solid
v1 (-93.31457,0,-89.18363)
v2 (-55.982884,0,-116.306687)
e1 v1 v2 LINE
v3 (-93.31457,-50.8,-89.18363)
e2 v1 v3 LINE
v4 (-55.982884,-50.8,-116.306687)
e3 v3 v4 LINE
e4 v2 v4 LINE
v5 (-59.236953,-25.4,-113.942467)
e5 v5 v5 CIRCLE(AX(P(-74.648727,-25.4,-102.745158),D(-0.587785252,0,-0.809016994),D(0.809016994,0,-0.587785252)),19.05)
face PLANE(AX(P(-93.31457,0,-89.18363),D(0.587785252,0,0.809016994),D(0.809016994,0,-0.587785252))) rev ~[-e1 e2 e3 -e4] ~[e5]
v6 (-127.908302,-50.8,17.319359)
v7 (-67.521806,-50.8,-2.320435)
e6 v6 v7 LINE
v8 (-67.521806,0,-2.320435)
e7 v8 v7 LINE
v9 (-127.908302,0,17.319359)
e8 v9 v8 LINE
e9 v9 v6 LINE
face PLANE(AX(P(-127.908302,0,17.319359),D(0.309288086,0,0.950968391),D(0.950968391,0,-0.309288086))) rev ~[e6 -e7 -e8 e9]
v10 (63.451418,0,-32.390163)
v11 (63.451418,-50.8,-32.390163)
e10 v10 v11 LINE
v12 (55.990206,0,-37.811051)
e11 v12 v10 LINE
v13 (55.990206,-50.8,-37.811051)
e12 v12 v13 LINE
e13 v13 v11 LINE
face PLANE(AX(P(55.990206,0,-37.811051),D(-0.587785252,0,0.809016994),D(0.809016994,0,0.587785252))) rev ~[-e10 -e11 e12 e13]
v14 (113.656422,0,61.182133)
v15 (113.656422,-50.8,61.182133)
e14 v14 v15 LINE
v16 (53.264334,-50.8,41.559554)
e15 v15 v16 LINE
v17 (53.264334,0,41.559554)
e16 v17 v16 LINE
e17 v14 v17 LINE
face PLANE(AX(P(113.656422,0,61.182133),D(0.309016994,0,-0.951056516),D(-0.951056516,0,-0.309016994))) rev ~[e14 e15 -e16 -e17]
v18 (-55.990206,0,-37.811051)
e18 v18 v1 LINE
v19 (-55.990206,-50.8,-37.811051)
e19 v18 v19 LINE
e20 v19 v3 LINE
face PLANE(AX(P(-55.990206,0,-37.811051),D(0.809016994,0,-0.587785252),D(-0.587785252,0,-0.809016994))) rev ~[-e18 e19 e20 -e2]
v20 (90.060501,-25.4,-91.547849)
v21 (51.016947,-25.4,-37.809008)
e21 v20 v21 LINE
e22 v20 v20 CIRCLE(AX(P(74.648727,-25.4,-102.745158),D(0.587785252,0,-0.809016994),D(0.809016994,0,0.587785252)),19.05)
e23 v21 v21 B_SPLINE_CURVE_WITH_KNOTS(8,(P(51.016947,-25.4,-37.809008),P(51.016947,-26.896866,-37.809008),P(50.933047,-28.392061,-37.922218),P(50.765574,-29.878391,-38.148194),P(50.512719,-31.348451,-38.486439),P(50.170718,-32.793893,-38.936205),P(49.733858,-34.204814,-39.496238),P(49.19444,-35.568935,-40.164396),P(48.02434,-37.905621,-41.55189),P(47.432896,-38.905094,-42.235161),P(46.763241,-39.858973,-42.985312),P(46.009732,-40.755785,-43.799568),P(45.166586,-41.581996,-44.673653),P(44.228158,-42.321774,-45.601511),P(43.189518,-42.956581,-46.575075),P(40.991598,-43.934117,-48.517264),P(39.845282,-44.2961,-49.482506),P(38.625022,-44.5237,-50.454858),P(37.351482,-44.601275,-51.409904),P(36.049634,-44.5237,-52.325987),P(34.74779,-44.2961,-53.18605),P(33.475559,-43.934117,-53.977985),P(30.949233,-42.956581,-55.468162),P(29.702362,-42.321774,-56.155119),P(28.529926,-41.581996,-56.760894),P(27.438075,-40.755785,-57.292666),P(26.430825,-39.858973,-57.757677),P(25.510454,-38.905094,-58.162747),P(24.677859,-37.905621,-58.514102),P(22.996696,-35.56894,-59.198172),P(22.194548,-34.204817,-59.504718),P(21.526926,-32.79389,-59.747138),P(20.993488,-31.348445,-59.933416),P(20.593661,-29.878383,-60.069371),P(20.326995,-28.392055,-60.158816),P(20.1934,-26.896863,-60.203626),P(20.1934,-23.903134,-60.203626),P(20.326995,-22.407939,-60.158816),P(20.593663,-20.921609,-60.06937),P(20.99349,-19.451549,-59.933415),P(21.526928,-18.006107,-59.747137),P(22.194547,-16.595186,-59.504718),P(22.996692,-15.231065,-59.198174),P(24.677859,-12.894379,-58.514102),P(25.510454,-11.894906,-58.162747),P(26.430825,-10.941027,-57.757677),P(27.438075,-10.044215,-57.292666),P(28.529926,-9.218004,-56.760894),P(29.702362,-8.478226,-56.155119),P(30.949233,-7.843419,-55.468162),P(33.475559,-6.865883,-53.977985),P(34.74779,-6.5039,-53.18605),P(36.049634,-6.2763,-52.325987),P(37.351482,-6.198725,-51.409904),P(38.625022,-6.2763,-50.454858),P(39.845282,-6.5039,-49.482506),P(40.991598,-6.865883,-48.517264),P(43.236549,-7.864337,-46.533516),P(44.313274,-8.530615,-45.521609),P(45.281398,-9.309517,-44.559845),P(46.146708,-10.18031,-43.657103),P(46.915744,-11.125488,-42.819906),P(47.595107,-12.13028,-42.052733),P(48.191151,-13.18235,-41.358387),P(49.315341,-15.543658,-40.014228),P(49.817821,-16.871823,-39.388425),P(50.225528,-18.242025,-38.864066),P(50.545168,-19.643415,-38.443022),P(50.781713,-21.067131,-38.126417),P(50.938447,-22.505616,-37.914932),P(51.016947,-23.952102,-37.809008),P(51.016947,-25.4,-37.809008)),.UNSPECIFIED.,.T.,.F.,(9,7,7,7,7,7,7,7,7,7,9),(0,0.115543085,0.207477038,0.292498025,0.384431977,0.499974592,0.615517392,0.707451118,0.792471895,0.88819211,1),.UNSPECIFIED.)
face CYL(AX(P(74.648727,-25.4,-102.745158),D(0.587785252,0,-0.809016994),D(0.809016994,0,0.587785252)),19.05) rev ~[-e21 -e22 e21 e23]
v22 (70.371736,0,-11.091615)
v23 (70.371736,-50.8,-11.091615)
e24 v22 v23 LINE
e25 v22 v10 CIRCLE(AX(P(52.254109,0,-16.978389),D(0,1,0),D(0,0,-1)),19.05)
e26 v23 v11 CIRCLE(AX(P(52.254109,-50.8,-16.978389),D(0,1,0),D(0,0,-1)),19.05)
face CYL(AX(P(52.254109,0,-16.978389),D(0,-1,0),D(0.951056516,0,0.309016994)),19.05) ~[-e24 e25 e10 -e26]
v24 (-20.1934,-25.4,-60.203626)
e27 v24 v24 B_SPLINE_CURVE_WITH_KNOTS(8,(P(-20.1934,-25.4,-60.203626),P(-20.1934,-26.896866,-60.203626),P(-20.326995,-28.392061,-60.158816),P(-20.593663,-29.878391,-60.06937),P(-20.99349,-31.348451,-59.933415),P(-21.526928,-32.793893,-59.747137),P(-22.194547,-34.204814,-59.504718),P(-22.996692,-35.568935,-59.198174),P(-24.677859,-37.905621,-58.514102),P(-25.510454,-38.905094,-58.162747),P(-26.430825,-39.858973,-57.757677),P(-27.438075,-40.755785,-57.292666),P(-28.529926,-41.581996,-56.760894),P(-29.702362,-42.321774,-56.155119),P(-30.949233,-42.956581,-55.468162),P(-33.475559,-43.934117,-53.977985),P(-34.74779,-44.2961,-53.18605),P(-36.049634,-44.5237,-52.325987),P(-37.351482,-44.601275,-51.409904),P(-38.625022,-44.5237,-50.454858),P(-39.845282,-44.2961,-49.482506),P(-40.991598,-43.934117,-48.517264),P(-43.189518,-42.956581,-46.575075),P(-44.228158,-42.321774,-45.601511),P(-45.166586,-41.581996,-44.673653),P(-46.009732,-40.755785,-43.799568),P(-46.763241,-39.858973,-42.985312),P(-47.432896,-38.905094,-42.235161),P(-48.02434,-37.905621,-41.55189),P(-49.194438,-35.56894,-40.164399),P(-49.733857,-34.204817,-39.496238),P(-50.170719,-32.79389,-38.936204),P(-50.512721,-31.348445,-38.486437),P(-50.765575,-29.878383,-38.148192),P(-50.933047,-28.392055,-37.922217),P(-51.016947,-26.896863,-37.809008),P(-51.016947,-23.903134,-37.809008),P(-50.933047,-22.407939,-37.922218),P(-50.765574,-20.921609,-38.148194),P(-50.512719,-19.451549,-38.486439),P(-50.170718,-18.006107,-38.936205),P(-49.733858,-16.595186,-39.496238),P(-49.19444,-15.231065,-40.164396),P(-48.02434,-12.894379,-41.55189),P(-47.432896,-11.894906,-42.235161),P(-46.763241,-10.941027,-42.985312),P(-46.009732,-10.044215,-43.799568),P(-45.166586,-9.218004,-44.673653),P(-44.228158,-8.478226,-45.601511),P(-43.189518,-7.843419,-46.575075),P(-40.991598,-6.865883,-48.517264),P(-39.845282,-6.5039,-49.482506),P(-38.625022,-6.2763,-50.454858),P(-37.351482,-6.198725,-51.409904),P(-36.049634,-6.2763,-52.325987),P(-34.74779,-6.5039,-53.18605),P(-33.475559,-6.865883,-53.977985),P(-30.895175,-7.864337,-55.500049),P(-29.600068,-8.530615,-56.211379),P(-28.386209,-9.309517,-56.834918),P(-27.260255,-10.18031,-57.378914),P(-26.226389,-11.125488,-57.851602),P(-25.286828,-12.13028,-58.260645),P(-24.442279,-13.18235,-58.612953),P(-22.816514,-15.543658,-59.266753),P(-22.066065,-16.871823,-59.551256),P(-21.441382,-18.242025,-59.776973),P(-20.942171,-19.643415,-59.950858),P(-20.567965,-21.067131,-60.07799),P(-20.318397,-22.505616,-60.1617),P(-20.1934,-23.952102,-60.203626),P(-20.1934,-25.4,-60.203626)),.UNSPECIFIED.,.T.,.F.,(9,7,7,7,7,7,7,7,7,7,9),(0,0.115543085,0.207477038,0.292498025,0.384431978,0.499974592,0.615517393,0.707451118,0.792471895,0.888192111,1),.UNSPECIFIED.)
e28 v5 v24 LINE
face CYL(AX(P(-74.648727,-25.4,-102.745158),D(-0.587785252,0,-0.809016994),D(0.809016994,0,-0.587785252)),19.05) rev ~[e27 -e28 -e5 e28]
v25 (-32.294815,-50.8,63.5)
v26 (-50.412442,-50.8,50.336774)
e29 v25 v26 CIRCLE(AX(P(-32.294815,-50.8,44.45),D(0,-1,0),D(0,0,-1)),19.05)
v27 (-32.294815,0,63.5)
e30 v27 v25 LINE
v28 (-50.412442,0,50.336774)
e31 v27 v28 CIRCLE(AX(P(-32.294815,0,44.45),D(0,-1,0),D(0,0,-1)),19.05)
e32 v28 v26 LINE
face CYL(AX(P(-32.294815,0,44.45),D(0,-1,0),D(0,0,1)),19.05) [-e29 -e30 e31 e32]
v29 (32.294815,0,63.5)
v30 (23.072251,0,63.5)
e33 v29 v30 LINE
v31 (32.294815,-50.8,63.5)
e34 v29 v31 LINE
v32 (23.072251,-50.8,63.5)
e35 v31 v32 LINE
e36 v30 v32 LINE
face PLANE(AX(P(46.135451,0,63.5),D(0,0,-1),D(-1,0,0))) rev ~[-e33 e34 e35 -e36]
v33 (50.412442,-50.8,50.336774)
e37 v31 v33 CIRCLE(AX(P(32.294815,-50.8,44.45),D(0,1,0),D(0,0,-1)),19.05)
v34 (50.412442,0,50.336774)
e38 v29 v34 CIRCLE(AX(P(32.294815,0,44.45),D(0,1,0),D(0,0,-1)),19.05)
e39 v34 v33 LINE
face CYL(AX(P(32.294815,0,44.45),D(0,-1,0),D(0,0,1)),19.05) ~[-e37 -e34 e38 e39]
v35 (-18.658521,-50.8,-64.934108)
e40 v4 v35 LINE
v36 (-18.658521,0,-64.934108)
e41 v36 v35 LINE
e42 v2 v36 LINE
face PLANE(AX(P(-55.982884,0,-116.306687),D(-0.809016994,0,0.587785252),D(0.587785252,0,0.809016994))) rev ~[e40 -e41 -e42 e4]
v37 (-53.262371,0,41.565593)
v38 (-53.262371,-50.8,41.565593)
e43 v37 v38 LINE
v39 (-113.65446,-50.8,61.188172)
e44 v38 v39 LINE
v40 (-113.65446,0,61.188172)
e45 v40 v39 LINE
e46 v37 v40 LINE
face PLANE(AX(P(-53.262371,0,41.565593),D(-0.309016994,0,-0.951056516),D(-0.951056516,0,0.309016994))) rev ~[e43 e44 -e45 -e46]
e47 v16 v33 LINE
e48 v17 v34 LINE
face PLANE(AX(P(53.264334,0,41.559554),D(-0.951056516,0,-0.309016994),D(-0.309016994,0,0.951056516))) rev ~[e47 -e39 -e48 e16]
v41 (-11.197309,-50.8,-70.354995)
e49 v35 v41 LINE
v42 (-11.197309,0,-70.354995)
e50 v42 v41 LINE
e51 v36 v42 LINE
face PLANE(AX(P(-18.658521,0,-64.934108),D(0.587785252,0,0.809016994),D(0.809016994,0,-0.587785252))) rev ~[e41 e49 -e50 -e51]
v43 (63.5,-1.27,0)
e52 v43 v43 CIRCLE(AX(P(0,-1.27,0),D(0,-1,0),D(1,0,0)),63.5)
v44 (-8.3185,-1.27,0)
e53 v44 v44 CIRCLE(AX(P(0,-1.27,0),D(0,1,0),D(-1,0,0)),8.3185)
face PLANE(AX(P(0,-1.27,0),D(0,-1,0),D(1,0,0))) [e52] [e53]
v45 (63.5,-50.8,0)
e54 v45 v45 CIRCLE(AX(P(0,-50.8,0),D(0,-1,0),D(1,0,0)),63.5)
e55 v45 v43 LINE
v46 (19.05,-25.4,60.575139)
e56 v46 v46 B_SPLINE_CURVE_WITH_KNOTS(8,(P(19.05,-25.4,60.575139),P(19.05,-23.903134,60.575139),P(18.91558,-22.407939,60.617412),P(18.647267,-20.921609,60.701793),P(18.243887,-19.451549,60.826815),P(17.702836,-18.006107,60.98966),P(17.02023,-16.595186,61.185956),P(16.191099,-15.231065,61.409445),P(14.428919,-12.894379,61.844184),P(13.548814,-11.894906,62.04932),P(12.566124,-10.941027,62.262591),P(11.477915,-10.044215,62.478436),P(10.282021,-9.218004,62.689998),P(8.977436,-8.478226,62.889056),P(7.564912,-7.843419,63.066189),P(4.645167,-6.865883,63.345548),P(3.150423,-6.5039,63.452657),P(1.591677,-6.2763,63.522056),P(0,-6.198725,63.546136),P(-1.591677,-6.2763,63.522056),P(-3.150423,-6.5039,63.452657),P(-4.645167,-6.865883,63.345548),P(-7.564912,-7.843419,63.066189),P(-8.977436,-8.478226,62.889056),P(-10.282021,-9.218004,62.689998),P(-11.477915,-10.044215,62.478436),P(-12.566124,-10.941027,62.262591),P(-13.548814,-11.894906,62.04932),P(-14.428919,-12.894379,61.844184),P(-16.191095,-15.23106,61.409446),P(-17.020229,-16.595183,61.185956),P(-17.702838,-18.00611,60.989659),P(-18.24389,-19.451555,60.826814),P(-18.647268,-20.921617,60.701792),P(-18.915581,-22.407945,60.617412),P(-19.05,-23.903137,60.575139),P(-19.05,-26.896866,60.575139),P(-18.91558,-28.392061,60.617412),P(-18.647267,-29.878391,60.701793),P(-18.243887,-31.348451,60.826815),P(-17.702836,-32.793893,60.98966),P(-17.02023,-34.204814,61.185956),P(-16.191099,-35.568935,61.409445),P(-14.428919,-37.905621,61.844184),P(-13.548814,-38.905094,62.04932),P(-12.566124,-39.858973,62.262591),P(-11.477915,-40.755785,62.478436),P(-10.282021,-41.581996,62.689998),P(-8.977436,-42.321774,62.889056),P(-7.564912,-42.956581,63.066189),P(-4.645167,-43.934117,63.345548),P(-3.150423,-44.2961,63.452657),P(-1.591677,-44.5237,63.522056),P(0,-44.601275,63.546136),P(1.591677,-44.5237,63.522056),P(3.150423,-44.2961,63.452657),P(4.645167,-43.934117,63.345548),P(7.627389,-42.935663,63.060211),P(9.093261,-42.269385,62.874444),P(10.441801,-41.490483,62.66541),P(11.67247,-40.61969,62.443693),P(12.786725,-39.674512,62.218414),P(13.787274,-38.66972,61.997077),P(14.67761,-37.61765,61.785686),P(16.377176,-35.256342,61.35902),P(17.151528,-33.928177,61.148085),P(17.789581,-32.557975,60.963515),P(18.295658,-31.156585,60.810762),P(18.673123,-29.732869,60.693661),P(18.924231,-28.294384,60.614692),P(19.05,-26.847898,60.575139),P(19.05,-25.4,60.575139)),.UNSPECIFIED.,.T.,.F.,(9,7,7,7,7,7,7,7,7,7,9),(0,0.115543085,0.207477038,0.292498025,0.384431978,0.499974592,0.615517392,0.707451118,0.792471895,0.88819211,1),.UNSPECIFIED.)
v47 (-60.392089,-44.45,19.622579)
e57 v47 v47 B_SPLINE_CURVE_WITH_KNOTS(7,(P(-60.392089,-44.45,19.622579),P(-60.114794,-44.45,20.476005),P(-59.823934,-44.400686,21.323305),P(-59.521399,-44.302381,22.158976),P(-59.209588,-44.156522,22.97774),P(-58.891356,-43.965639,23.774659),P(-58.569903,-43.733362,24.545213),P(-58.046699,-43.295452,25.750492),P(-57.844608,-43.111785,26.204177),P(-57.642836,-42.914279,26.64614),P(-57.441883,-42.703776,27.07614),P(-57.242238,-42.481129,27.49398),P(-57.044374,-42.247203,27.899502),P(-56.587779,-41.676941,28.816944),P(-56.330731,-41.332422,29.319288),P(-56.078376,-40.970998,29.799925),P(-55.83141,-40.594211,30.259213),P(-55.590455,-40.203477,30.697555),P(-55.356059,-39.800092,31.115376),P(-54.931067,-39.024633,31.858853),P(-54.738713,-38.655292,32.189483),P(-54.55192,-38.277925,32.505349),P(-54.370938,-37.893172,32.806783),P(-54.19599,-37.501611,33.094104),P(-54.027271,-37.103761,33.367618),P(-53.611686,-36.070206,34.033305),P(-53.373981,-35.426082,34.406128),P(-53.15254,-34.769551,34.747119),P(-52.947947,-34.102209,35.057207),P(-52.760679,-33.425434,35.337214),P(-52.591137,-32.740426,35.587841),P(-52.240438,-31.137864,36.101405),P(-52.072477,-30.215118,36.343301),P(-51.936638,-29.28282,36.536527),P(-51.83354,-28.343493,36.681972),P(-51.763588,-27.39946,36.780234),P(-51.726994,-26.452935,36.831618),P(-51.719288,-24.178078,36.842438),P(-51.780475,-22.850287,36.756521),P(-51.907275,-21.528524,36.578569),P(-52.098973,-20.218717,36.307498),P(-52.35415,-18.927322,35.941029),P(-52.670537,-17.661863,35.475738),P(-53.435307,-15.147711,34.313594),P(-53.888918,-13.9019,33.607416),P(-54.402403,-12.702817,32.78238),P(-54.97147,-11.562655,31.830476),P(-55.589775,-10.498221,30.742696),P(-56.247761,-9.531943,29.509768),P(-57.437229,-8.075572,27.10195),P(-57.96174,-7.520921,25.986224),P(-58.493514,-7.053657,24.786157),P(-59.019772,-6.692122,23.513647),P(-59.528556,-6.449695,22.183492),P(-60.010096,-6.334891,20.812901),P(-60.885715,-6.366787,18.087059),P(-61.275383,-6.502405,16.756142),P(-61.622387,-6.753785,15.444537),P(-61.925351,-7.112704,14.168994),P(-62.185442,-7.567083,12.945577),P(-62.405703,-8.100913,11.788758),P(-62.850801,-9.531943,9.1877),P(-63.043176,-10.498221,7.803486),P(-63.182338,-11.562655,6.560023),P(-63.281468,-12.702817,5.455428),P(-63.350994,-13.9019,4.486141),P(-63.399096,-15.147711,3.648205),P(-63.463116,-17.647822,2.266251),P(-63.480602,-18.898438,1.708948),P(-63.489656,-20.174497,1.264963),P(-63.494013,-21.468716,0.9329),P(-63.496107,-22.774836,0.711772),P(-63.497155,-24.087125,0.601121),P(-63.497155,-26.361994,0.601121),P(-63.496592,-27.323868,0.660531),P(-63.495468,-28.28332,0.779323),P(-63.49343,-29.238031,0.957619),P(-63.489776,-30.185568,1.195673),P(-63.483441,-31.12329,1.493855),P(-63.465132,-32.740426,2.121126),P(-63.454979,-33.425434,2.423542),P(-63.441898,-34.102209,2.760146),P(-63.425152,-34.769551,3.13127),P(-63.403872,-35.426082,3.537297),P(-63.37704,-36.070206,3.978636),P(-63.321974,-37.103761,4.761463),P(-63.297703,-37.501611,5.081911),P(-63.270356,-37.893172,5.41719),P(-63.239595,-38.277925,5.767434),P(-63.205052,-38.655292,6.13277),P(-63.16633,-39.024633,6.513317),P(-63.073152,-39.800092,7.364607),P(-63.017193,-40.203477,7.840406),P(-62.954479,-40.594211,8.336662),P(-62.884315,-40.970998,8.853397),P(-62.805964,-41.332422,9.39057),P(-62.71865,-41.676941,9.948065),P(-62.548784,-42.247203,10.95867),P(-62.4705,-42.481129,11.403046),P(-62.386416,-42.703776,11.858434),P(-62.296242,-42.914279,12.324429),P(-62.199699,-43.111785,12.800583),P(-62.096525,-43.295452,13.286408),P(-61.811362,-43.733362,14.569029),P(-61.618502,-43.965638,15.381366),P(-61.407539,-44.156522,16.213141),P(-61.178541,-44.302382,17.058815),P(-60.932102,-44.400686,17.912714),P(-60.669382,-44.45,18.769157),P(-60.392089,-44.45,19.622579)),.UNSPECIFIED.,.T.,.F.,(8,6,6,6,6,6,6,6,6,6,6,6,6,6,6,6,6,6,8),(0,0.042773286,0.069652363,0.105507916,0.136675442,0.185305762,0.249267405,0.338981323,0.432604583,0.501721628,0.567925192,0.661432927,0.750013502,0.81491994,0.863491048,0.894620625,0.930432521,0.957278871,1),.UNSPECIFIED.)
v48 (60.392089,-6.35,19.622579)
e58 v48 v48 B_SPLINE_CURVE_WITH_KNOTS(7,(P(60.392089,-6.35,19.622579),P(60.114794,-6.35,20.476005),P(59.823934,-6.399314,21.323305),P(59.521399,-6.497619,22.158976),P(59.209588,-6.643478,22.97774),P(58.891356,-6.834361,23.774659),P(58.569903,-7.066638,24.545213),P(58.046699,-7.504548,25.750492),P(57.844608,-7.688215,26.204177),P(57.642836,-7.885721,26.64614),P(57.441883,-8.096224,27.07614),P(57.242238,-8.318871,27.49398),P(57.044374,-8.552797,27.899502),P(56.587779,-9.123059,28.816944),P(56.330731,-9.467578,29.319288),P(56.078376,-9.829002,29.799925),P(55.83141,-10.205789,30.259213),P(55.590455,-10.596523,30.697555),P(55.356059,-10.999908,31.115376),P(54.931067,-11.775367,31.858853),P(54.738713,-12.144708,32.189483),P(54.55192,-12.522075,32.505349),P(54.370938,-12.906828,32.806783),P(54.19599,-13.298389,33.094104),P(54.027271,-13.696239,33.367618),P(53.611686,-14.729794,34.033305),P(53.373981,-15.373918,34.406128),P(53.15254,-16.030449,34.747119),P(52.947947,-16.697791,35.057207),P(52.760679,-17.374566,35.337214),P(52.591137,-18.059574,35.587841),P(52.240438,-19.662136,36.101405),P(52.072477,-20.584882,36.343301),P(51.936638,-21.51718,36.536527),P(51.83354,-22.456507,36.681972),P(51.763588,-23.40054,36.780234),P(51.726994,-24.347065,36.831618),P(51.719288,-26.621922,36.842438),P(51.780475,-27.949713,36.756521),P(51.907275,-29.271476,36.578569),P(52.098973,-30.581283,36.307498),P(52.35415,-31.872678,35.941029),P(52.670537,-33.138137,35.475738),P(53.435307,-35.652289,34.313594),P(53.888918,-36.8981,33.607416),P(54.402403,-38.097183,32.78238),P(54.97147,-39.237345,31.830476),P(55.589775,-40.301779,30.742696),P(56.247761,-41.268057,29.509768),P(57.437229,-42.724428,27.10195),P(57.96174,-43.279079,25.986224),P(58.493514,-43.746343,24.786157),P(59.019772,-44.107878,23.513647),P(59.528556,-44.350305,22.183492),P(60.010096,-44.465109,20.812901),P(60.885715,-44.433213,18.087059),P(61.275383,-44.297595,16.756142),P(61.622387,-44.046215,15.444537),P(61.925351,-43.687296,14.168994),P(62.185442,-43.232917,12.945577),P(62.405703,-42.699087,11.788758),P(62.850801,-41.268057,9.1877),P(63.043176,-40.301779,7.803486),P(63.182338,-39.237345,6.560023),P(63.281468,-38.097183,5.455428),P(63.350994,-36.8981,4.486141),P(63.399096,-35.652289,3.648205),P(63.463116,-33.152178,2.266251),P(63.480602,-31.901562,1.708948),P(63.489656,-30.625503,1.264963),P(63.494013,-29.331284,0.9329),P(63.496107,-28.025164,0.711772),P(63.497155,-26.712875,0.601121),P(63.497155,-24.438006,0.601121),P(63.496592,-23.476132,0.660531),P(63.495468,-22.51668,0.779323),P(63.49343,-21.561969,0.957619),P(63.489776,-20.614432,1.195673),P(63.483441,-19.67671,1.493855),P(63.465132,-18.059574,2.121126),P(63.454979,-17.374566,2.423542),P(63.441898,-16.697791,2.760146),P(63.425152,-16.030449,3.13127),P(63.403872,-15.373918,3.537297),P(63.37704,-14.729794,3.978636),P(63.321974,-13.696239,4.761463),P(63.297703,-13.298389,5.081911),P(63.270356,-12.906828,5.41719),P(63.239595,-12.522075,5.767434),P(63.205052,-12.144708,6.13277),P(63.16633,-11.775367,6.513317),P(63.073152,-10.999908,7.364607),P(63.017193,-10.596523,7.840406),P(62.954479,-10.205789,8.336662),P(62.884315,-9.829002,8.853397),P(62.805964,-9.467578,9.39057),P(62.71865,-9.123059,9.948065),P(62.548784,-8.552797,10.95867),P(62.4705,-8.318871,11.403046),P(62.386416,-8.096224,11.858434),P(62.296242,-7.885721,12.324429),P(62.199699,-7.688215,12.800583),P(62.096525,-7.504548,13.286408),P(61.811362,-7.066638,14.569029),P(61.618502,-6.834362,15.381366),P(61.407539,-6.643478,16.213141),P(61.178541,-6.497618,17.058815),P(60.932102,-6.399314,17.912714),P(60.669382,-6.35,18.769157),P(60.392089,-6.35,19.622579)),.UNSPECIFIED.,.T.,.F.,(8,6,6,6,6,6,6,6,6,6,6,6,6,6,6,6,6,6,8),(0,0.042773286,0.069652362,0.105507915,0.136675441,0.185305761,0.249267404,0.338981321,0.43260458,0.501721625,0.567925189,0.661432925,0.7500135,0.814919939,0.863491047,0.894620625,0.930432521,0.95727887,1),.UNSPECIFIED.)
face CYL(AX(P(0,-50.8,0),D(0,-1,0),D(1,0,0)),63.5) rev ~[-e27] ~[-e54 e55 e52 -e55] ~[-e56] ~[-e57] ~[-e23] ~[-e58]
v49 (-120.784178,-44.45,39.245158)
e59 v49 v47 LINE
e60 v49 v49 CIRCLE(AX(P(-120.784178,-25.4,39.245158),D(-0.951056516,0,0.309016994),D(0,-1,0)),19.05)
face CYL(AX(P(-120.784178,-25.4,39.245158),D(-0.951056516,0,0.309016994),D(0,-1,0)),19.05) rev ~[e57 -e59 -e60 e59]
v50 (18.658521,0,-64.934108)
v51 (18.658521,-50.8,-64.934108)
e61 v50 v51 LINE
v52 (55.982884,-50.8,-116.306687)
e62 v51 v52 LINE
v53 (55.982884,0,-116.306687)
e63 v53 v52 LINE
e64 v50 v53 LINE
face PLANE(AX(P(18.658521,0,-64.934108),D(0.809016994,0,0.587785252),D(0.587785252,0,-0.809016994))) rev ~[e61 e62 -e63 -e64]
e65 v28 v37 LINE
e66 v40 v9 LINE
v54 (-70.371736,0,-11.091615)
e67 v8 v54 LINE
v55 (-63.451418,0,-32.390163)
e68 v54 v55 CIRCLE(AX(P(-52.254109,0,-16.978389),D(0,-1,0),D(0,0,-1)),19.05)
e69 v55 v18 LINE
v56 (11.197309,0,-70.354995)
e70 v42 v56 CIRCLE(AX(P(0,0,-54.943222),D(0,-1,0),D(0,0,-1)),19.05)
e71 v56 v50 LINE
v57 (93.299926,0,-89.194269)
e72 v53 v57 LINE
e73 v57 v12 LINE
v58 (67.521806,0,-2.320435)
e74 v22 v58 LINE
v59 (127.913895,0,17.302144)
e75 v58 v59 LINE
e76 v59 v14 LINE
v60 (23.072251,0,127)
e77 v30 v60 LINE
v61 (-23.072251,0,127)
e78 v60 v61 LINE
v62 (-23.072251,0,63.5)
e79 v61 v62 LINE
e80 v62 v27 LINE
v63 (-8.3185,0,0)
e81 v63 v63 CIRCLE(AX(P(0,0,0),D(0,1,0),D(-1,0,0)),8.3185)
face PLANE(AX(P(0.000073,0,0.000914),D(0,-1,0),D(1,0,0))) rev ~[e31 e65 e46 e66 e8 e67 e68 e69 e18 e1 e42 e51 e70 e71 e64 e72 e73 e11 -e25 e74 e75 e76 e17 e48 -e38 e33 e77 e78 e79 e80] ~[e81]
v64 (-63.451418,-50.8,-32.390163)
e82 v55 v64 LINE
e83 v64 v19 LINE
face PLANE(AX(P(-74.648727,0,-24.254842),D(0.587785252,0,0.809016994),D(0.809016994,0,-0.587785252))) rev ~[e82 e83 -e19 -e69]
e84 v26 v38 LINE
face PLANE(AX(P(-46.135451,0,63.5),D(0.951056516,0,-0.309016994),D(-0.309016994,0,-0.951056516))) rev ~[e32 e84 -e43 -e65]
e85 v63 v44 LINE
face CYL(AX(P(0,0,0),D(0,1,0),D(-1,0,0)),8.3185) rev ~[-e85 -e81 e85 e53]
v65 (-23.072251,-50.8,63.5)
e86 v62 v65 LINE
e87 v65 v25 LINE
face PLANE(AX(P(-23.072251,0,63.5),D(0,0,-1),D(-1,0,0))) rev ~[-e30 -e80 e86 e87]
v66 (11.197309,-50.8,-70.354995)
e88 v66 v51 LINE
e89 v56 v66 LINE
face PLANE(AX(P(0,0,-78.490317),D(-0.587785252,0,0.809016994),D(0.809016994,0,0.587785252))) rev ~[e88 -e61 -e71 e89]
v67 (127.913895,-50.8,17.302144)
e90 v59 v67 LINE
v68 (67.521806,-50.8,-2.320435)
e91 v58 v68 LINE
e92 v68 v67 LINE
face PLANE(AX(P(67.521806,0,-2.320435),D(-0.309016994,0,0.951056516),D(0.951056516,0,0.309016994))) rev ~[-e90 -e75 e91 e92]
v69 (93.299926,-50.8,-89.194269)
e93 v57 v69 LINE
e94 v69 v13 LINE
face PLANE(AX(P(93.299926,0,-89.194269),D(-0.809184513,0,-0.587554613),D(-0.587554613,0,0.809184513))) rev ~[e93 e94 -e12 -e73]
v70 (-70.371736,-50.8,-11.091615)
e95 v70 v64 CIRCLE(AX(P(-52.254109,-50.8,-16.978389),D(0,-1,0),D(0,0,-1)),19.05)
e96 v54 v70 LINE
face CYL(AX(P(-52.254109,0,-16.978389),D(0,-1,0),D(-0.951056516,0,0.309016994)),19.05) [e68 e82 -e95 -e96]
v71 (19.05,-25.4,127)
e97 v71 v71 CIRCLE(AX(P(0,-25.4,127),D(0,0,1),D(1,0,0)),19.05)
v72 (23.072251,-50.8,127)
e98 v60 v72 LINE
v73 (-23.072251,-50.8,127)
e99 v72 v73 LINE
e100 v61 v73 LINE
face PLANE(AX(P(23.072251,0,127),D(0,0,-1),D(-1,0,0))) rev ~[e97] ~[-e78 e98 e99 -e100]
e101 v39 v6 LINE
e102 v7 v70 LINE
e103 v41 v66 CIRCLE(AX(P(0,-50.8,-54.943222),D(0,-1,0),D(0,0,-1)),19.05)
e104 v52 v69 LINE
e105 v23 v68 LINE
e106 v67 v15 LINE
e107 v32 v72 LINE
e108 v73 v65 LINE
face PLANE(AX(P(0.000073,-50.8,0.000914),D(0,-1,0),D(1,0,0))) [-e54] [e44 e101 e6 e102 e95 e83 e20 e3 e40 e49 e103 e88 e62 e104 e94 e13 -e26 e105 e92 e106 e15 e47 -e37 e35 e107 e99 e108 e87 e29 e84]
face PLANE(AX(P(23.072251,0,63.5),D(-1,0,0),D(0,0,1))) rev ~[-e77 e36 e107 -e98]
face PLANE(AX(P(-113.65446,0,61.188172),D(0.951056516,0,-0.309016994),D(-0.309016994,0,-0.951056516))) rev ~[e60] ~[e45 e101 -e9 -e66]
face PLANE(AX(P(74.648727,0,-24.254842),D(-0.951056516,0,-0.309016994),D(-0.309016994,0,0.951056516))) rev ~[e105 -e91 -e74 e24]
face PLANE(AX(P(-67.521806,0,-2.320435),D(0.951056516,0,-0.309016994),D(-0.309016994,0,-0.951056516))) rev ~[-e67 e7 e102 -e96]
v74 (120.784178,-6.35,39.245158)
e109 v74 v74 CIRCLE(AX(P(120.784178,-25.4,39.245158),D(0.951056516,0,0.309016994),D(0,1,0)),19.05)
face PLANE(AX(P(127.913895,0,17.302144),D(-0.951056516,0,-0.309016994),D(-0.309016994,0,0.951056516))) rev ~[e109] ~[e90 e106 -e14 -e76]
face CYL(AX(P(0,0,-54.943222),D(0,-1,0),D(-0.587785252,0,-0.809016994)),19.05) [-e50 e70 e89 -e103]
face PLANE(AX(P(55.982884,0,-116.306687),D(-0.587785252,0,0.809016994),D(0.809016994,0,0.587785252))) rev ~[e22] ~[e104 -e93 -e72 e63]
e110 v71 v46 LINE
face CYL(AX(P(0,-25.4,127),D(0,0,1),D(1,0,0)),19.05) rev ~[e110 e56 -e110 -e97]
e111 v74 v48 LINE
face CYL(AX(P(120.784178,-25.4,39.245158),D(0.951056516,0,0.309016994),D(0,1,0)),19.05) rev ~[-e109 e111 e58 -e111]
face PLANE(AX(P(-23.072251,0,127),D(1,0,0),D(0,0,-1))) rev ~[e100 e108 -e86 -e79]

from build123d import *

# Parameters (mm, degrees)
F1_DEPTH  = 50.8
F2_R      = 63.5
F3_DEPTH  = 49.53
F4_R      = 8.3185
F5_DEPTH  = 25.4
F9_R      = 19.05
F11_DEPTH = 76.2
F10_R     = 19.05
F12_DEPTH = 76.2
F6_R      = 19.05
F13_DEPTH = 76.2
F7_R      = 19.05
F14_DEPTH = 76.2
F8_R      = 19.05
F15_DEPTH = 76.2
F16_R     = 19.05


# Not quite as in the source:
# - a feature names something its author has since deleted; it is built from what else it names


with BuildPart() as f1:
    # F0 (on Front) → F1 (new body)
    with BuildSketch(Plane.XZ):
        Polygon((-23.0722505283, 63.5), (-46.1354505283, 63.5), (-53.262371273, 41.5655933534), (-113.6544600578, 61.1881724962), (-127.9083015471, 17.319359203), (-67.5218062965, -2.3204350678), (-74.6487270411, -24.2548417144), (-55.9902062965, -37.8110505451), (-93.314569817, -89.1836296879), (-55.9828842652, -116.3066868834), (-18.6585207447, -64.9341077406), (0, -78.4903165712), (18.6585207447, -64.9341077406), (55.9828842652, -116.3066868834), (93.2999257546, -89.194269222), (55.9902062965, -37.8110505451), (74.6487270411, -24.2548417144), (67.5218062965, -2.3204350678), (127.9138950812, 17.302144075), (113.6564223157, 61.1821332873), (53.2643335309, 41.5595541445), (46.1354505283, 63.5), (23.0722505283, 63.5), (23.0722505283, 127), (-23.0722505283, 127), align=None)
    extrude(amount=F1_DEPTH)

    # F2 (on face) → F3 (cut)
    with BuildSketch(Plane.XZ.offset(50.8)):
        Circle(F2_R)
    extrude(amount=-F3_DEPTH, mode=Mode.SUBTRACT)

    # F4 (on face) → F5 (cut)
    with BuildSketch(Plane(origin=(0, 0, 0), x_dir=(-1, 0, 0), z_dir=(0, 1, 0))):
        Circle(F4_R)
    extrude(amount=-F5_DEPTH, mode=Mode.SUBTRACT)

    # F9 (on face) → F11 (cut)
    with BuildSketch(Plane(origin=(-74.6487270411, 0, -102.7451582856), x_dir=(0.8090169944, 0, -0.5877852523), z_dir=(-0.5877852523, 0, -0.8090169944))):
        with Locations((0, 25.4)):
            Circle(F9_R)
    extrude(amount=-F11_DEPTH, mode=Mode.SUBTRACT)

    # F10 (on face) → F12 (cut)
    with BuildSketch(Plane(origin=(-120.7841775695, 0, 39.2451582856), x_dir=(0, -1, 0), z_dir=(-0.9510565163, 0, 0.3090169944))):
        with Locations((25.4, 0)):
            Circle(F10_R)
    extrude(amount=-F12_DEPTH, mode=Mode.SUBTRACT)

    # F6 (on face) → F13 (cut)
    with BuildSketch(Plane.XY.offset(127)):
        with Locations((0, -25.4)):
            Circle(F6_R)
    extrude(amount=-F13_DEPTH, mode=Mode.SUBTRACT)

    # F7 (on face) → F14 (cut)
    with BuildSketch(Plane(origin=(120.7841775695, 0, 39.2451582856), x_dir=(0, 1, 0), z_dir=(0.9510565163, 0, 0.3090169944))):
        with Locations((-25.4, 0)):
            Circle(F7_R)
    extrude(amount=-F14_DEPTH, mode=Mode.SUBTRACT)

    # F8 (on face) → F15 (cut)
    with BuildSketch(Plane(origin=(74.6487270411, 0, -102.7451582856), x_dir=(0.8090169944, 0, 0.5877852523), z_dir=(0.5877852523, 0, -0.8090169944))):
        with Locations((0, 25.4)):
            Circle(F8_R)
    extrude(amount=-F15_DEPTH, mode=Mode.SUBTRACT)

    # F16
    f16_edges = [f1.edges().sort_by_distance(p)[0] for p in [
        (0, -25.4, -78.490317),
        (74.648727, -25.4, -24.254842),
        (-74.648727, -25.4, -24.254842),
        (-46.135451, -25.4, 63.5),
        (46.135451, -25.4, 63.5),
    ]]
    fillet(f16_edges, radius=F16_R)


solid = f1.part
